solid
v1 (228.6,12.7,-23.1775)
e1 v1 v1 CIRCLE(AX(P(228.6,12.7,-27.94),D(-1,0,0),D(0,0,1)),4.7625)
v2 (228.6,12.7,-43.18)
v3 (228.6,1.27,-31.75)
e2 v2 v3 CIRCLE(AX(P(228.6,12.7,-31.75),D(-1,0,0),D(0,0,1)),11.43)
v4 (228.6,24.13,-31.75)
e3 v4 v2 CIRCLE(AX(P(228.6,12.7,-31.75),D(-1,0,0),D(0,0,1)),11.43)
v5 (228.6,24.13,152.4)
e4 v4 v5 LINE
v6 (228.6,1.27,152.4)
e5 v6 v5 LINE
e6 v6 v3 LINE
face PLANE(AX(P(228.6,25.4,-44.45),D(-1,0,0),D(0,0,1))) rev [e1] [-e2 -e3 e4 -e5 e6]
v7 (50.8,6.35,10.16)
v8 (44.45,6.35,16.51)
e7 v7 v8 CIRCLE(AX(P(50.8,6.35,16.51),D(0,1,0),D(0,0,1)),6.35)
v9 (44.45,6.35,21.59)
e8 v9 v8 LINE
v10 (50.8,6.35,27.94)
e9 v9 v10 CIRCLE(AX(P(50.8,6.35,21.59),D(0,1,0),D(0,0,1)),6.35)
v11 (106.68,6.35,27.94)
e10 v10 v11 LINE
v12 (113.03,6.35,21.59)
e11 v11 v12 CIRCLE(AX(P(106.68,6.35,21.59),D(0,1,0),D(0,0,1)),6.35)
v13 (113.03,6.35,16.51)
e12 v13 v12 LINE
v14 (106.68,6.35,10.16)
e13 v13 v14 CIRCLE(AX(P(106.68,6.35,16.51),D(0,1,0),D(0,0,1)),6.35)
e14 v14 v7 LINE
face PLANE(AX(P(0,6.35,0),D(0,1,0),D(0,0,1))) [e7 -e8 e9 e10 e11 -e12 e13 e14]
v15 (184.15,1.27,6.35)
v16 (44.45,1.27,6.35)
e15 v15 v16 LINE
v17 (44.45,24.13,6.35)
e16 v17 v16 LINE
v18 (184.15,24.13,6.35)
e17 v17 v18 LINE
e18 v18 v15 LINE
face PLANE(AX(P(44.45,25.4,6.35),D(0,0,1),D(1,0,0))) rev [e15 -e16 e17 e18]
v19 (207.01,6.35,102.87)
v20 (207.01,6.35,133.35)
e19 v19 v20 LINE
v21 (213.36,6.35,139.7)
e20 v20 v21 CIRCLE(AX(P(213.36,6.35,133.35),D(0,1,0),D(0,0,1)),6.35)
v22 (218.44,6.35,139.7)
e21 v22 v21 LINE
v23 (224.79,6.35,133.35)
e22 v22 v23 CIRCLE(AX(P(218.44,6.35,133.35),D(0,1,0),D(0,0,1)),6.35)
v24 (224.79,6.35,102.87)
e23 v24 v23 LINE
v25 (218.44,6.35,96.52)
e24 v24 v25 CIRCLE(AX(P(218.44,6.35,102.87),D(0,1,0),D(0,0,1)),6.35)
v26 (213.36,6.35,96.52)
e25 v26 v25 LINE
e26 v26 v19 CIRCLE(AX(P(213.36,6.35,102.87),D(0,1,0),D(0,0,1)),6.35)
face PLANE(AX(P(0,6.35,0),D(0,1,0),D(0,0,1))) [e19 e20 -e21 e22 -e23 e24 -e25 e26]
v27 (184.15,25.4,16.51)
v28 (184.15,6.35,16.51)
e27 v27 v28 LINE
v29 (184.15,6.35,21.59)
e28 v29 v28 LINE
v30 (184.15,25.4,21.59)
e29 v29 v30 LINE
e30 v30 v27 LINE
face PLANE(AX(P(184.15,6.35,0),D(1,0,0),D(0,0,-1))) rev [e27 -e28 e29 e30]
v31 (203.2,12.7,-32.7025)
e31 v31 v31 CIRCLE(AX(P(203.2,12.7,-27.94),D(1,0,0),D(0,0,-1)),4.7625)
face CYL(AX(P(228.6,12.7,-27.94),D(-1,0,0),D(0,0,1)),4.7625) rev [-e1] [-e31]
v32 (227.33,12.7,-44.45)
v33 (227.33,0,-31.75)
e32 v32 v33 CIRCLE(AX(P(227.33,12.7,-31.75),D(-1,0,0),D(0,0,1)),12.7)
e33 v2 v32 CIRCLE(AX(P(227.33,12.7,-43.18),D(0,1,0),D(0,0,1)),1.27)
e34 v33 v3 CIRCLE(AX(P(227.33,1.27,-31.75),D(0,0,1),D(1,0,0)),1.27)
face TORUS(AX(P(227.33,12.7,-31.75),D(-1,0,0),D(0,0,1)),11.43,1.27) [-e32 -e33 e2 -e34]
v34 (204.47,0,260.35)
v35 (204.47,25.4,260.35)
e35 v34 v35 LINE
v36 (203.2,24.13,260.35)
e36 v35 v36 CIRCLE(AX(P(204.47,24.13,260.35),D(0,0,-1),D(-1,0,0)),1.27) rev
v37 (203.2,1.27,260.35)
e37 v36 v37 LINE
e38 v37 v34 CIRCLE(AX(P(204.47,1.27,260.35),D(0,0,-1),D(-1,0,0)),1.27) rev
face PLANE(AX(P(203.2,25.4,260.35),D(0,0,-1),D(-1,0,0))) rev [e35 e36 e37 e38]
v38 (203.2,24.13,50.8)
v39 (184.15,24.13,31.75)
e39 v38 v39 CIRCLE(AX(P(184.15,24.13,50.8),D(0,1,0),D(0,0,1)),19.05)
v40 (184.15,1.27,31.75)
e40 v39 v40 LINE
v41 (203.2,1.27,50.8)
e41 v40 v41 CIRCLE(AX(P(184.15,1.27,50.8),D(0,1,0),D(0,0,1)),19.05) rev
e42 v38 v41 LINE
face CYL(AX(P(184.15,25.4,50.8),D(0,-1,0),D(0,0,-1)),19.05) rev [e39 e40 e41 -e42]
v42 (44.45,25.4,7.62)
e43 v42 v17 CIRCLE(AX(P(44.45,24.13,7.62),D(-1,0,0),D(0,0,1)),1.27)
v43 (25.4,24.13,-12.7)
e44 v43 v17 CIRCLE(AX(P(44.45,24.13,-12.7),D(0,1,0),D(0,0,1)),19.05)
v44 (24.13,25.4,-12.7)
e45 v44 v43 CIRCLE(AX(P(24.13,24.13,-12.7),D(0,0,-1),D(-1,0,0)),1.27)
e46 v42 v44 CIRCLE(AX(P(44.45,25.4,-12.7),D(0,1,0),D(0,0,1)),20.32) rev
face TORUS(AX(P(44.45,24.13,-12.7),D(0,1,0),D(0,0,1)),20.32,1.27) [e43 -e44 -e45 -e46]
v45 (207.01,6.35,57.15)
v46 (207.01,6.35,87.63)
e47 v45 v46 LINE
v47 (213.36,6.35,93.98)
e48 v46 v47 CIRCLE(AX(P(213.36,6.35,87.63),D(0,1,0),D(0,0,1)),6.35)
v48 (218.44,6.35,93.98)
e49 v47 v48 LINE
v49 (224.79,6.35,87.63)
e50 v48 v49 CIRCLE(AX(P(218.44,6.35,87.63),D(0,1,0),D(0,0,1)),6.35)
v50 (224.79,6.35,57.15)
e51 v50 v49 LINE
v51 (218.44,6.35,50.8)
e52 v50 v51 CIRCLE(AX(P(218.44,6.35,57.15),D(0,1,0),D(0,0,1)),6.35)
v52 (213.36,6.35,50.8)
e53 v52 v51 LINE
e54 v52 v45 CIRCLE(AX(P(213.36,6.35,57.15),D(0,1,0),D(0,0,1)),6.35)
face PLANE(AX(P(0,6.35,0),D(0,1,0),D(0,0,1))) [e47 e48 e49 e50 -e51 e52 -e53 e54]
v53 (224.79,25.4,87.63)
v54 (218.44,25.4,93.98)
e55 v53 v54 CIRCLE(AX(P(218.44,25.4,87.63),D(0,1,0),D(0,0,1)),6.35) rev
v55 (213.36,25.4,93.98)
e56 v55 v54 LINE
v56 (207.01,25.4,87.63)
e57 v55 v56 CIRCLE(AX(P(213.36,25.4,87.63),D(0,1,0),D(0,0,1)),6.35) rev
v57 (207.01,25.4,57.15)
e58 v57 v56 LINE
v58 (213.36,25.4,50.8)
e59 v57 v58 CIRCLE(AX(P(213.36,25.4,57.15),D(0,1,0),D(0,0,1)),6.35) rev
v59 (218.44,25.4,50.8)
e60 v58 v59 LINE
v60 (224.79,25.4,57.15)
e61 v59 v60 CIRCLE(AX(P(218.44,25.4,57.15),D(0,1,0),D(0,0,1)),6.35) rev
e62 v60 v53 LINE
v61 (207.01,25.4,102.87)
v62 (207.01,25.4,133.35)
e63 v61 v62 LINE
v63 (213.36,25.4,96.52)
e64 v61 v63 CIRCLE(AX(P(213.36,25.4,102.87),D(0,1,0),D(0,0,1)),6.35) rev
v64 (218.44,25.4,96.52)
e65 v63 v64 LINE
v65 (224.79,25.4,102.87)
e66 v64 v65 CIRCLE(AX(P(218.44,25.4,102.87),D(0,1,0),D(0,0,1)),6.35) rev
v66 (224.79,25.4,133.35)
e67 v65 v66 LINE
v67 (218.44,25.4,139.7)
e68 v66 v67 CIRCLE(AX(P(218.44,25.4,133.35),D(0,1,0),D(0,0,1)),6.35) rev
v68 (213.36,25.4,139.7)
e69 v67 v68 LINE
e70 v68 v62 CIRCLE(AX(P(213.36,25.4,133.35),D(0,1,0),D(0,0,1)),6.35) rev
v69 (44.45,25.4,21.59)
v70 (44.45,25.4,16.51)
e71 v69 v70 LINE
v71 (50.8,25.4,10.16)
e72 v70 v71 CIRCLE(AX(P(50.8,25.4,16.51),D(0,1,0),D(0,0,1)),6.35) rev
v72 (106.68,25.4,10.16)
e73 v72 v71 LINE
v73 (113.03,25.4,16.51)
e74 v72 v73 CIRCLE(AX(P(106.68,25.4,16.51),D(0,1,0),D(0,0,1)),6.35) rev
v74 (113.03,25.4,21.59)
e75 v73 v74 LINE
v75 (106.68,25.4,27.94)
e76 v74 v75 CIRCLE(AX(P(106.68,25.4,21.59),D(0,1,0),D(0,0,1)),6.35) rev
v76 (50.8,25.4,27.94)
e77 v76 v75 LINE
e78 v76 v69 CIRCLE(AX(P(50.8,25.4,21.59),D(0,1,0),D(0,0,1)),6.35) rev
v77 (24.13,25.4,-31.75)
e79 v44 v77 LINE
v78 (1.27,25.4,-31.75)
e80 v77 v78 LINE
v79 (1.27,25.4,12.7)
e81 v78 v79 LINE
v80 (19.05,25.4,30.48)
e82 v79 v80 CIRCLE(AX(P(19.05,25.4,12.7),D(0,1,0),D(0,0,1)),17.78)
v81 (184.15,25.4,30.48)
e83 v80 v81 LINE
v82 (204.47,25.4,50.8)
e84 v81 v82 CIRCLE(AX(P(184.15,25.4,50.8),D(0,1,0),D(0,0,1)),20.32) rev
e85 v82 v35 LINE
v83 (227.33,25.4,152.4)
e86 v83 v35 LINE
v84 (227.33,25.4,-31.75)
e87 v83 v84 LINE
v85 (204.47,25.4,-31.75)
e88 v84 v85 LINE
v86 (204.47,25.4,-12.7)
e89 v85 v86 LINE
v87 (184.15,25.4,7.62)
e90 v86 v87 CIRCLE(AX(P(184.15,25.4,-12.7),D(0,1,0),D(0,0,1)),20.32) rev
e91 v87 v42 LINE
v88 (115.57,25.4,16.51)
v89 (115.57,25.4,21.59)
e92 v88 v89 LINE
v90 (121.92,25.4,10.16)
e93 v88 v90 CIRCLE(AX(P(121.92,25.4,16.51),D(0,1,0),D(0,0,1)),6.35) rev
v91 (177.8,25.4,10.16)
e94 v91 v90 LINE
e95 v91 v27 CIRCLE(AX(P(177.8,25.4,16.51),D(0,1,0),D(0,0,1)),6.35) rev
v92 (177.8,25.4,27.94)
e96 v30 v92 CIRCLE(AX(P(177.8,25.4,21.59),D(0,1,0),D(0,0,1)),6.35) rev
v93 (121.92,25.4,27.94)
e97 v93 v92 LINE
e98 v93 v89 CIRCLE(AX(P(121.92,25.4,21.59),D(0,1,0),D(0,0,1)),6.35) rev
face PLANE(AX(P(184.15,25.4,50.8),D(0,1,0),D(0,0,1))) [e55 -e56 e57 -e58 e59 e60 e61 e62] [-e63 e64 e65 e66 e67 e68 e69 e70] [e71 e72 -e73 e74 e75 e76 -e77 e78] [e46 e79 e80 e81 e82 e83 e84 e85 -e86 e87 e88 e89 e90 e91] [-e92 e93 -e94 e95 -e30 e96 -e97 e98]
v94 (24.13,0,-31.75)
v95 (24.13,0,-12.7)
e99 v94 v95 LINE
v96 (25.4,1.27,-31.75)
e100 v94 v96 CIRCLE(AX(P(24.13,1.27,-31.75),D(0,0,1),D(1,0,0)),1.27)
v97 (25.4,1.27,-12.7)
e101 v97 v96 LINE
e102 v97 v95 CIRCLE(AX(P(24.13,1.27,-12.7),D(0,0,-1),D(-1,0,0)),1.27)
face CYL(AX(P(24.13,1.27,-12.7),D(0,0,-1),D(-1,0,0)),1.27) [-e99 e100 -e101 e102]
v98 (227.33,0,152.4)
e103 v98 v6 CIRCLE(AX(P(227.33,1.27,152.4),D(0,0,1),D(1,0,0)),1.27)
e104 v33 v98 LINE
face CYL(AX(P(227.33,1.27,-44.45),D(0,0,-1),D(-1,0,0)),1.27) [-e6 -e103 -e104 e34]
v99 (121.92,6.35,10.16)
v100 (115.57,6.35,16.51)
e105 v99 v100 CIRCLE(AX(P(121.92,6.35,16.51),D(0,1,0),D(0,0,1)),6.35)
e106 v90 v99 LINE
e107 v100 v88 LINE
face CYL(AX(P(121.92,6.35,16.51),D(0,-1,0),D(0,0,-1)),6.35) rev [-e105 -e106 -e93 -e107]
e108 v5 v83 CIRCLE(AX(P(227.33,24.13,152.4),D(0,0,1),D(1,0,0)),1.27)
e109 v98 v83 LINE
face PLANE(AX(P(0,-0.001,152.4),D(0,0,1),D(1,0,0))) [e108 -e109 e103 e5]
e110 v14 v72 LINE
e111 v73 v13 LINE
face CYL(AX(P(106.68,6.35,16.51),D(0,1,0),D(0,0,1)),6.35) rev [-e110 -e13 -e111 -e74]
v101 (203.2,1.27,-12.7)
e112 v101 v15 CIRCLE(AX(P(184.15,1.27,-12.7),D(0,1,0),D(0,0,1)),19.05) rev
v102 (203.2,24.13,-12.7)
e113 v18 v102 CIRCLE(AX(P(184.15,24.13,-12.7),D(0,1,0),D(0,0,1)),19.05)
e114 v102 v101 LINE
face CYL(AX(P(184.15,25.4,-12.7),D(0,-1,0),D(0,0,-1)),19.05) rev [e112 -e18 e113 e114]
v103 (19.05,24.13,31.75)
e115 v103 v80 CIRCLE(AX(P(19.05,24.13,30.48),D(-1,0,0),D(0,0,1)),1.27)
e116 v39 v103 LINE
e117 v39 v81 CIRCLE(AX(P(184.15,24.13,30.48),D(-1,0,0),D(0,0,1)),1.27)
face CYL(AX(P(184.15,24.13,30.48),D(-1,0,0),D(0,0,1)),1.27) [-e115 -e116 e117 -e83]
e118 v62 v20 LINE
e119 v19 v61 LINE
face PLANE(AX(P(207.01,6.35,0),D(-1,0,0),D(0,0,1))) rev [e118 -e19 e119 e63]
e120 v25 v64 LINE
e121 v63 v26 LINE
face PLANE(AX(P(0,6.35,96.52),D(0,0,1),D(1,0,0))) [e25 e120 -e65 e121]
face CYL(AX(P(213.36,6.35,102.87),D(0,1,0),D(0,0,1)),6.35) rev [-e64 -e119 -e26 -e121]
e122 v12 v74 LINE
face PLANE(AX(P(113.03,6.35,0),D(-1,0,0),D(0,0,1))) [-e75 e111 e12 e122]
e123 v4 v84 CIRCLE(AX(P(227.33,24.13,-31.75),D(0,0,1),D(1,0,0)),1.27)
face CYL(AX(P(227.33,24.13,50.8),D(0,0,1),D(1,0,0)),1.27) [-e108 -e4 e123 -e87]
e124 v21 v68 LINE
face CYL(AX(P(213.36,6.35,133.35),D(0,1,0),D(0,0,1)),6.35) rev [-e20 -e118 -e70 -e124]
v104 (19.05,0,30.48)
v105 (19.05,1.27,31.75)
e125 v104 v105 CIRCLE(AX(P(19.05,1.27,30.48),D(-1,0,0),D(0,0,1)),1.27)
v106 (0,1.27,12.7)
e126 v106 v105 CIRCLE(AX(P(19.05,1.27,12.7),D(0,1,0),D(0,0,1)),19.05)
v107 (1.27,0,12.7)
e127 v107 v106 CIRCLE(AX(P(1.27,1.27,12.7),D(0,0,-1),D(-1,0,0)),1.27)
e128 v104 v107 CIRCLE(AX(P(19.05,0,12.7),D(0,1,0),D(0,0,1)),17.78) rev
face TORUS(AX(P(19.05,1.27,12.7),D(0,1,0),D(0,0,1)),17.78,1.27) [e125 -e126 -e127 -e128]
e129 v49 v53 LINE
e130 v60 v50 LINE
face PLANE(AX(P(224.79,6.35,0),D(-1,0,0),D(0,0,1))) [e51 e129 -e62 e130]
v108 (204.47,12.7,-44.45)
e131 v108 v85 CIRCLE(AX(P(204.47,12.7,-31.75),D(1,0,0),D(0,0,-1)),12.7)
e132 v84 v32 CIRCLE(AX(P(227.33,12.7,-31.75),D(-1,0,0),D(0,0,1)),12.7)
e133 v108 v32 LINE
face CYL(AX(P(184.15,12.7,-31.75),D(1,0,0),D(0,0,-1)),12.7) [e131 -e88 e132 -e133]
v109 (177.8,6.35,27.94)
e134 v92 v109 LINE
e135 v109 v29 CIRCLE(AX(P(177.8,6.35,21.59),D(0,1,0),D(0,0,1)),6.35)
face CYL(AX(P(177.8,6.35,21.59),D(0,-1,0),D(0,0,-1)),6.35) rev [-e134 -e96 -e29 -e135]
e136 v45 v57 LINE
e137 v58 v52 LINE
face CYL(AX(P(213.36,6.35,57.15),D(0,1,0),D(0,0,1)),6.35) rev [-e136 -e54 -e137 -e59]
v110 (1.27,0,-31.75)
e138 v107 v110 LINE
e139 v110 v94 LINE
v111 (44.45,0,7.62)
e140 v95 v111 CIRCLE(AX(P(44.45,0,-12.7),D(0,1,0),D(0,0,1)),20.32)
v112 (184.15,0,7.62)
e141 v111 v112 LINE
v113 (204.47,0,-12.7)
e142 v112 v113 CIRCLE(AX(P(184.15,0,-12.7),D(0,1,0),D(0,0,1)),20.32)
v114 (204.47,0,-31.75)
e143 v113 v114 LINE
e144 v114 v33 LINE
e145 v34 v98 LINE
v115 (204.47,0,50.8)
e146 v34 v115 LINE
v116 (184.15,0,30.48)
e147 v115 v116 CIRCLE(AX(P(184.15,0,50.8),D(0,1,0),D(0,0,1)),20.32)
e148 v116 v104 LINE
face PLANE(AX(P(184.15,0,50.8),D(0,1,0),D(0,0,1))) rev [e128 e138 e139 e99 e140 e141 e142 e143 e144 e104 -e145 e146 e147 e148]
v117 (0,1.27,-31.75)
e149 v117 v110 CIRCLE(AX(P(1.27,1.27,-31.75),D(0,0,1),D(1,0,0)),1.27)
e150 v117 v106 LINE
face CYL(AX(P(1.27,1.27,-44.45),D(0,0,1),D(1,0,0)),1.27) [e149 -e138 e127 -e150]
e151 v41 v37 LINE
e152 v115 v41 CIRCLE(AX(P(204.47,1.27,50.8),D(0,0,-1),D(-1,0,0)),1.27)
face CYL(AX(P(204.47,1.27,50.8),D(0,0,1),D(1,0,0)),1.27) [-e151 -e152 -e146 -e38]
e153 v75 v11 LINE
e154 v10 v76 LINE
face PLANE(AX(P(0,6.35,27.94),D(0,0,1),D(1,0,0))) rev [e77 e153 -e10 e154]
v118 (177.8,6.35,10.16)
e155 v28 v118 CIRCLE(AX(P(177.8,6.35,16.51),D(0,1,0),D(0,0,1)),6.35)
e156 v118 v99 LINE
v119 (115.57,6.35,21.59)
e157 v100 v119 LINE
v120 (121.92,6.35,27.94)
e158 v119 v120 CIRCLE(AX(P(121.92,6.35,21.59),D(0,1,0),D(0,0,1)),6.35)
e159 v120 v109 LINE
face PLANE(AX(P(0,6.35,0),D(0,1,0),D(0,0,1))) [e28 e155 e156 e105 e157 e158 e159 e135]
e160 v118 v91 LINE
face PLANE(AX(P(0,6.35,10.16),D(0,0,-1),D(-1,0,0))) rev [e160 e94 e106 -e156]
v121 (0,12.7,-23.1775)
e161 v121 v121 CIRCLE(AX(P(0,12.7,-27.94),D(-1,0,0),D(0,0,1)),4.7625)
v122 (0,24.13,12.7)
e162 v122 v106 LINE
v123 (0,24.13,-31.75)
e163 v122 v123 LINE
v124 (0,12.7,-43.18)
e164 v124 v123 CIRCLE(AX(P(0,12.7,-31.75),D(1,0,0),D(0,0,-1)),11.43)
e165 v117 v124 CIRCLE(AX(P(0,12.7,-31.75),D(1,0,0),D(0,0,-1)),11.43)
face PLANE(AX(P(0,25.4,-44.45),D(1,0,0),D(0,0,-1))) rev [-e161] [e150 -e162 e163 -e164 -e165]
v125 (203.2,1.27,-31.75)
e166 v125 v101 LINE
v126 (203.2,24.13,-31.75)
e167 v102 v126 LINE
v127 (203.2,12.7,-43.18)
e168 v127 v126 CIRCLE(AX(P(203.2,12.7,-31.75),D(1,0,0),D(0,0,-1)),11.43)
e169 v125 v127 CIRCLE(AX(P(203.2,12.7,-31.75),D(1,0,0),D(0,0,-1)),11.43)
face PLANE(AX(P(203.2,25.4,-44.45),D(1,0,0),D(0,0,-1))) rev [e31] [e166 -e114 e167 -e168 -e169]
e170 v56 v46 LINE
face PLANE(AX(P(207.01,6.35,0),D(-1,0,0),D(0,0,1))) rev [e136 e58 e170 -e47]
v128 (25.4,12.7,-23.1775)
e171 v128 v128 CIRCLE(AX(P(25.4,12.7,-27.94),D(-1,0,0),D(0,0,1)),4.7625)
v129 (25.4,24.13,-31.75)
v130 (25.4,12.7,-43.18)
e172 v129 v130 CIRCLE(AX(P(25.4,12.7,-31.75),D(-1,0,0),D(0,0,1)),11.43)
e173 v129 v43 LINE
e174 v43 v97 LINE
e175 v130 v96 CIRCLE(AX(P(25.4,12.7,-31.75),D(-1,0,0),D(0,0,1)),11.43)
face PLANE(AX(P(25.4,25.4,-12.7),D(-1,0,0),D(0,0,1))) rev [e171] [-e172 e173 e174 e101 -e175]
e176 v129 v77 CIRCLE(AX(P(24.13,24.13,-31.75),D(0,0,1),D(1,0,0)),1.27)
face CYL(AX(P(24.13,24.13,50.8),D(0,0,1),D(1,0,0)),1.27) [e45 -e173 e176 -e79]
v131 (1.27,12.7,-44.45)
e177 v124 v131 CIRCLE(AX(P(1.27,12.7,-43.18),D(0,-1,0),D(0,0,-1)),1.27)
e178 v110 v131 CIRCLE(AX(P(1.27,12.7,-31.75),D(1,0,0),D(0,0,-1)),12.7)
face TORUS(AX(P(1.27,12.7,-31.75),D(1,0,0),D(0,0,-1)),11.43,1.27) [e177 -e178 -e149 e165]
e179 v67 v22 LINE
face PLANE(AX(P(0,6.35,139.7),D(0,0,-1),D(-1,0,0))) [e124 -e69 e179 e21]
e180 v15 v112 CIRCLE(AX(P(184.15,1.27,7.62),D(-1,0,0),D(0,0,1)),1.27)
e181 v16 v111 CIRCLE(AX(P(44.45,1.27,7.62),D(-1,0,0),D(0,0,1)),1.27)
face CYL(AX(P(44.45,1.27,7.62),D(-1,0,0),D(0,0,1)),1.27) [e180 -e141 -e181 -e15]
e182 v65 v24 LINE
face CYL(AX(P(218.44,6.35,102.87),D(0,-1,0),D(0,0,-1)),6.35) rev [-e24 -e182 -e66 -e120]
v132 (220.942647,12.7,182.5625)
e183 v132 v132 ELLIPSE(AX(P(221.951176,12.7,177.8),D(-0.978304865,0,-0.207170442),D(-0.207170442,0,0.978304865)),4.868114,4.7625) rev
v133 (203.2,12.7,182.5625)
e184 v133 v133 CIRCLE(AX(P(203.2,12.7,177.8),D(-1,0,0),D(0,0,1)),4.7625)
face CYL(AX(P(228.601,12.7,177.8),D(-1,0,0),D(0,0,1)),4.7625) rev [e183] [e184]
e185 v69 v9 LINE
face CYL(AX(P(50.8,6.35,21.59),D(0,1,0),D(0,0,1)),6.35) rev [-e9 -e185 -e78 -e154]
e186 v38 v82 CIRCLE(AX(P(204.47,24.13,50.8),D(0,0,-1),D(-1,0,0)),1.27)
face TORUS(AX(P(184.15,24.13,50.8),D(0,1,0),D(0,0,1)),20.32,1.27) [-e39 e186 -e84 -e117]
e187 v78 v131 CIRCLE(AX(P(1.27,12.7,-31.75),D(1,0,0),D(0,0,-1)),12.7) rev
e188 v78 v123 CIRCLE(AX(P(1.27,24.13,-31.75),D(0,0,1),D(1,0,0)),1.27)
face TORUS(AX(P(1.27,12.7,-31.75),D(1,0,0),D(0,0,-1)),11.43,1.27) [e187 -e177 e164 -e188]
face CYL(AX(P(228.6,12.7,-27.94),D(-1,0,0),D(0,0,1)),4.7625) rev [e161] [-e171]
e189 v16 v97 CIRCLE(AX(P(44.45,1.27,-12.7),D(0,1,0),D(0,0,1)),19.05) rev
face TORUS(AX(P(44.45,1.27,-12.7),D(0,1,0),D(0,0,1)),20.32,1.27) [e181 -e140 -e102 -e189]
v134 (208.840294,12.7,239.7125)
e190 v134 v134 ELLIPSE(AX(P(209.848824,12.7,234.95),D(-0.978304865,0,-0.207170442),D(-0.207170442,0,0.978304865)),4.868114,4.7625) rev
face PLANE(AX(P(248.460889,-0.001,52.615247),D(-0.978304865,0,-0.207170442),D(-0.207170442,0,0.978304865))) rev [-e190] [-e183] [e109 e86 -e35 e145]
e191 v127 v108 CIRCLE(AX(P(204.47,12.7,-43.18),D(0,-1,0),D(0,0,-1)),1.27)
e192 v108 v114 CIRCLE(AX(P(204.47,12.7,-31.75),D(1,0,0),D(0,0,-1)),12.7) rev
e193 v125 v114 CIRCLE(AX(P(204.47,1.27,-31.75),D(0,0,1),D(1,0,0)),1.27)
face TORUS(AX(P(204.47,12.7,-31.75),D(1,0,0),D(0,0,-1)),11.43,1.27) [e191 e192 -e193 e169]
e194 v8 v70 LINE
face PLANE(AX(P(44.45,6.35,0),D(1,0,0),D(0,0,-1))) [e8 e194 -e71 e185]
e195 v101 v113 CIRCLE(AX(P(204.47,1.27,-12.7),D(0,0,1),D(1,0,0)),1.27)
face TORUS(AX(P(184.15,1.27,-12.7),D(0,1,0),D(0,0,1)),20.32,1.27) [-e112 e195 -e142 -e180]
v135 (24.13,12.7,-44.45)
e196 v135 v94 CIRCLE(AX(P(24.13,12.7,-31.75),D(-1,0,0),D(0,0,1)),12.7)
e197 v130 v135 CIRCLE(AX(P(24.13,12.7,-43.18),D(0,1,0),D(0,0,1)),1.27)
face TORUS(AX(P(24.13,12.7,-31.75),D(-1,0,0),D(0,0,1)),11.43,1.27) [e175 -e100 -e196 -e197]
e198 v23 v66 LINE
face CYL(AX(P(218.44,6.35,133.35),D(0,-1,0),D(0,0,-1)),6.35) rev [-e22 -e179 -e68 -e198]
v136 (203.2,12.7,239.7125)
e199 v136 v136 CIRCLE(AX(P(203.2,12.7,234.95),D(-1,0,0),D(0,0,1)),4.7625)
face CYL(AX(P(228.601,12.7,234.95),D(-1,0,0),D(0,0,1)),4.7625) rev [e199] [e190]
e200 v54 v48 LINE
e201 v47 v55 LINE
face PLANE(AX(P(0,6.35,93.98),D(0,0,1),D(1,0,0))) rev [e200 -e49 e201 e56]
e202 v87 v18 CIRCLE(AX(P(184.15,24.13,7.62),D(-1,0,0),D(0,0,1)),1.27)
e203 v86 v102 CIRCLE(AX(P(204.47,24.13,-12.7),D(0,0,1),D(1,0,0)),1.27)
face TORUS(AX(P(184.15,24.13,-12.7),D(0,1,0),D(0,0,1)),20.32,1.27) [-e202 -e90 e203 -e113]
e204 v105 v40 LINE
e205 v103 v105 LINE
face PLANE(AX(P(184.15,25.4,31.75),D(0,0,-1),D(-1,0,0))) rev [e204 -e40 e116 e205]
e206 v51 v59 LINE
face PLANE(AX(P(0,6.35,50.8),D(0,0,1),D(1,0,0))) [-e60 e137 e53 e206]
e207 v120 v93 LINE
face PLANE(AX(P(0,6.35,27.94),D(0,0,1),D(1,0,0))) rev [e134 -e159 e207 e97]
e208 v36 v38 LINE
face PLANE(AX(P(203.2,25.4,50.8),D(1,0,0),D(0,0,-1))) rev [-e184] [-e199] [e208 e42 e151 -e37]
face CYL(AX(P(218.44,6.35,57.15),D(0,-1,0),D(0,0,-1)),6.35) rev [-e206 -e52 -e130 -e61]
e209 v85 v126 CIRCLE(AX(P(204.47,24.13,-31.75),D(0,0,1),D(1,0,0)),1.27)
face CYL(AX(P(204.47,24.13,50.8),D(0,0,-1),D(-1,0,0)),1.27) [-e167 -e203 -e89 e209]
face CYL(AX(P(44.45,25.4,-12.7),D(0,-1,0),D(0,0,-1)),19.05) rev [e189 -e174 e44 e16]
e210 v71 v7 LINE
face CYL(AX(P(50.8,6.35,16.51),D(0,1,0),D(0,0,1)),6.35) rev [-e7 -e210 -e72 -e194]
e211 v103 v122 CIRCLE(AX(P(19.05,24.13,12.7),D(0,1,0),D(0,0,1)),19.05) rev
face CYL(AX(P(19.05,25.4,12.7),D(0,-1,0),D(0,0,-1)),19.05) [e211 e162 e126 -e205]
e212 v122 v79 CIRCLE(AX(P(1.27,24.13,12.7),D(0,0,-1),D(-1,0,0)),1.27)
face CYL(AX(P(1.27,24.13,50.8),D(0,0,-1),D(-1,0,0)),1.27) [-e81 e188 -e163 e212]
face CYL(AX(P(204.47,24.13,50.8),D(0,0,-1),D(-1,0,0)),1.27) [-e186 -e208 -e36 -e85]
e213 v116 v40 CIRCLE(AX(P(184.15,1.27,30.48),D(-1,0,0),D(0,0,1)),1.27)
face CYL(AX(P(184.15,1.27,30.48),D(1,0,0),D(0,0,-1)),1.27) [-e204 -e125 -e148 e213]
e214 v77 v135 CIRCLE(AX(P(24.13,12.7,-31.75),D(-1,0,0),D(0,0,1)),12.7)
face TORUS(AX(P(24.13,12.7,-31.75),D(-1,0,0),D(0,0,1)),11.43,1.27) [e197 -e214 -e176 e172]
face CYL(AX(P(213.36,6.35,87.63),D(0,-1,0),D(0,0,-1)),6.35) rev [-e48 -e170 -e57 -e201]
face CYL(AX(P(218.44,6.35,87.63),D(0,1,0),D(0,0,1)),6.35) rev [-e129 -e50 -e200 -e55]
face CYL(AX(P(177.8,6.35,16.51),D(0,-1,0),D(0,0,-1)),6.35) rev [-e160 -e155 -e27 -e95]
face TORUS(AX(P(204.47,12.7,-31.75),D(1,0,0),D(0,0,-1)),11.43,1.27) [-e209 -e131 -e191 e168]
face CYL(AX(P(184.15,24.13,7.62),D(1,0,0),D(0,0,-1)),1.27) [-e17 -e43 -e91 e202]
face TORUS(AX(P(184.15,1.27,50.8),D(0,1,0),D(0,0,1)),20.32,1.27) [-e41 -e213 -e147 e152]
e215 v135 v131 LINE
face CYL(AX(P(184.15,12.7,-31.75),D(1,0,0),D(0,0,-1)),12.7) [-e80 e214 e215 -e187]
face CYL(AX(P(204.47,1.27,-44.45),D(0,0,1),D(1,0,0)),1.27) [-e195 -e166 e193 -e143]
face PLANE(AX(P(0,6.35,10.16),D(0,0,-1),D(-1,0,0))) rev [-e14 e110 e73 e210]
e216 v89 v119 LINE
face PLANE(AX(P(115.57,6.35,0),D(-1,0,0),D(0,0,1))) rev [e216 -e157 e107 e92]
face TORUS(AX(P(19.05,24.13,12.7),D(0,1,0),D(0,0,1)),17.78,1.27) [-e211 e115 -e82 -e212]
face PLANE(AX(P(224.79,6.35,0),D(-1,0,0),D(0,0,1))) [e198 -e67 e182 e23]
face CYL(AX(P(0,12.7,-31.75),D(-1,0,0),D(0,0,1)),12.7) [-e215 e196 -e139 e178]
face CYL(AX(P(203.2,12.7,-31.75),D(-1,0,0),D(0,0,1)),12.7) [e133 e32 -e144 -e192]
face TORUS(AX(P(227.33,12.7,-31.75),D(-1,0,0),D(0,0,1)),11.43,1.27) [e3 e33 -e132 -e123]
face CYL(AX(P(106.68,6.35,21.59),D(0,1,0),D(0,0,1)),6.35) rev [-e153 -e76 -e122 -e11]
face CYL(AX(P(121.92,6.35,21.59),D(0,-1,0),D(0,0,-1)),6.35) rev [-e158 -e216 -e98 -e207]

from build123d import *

# Parameters (mm, degrees)
BOSS_EXTRUDE1_DEPTH     = 25.4
CUT_EXTRUDE3_REACH      = 349.398
FILLET1_R               = 1.27
CUT_EXTRUDE4_REACH      = 333.236
SKETCH4_R               = 4.7625
FILLET2_R               = 12.7
CUT_EXTRUDE5_DEPTH      = 332.236354444
CUT_EXTRUDE5_DEPTH_BACK = 332.236354444
SKETCH17_R              = 4.7625
SKETCH18_W              = 68.58
SKETCH18_H              = 17.78
SKETCH18_W_2            = 17.78
SKETCH18_H_2            = 43.18
CUT_EXTRUDE6_DEPTH      = 19.05
FILLET3_R               = 6.35


with BuildPart() as part:
    # Sketch1 → Boss-Extrude1 (new body)
    with BuildSketch(Plane(origin=(0, 0, 0), x_dir=(1, 0, 0), z_dir=(0, 1, 0))):
        with BuildLine():
            Line((44.45, -6.35), (184.15, -6.35))
            ThreePointArc((184.15, -6.35), (197.620384182, -0.770384182), (203.2, 12.7))
            Line((203.2, 12.7), (203.2, 44.45))
            Line((203.2, 44.45), (228.6, 44.45))
            Line((228.6, 44.45), (228.6, -260.35))
            Line((228.6, -260.35), (203.2, -260.35))
            Line((203.2, -260.35), (203.2, -50.8))
            ThreePointArc((203.2, -50.8), (197.620384182, -37.329615818), (184.15, -31.75))
            Line((184.15, -31.75), (19.05, -31.75))
            ThreePointArc((19.05, -31.75), (5.579615818, -26.170384182), (0, -12.7))
            Line((0, -12.7), (0, 44.45))
            Line((0, 44.45), (25.4, 44.45))
            Line((25.4, 44.45), (25.4, 12.7))
            ThreePointArc((25.4, 12.7), (30.979615818, -0.770384182), (44.45, -6.35))
        make_face()
    extrude(amount=BOSS_EXTRUDE1_DEPTH)

    # Sketch3 → Cut-Extrude3 (cut, up to next)
    with BuildSketch(Plane(origin=(0, 25.4, 0), x_dir=(1, 0, 0), z_dir=(0, 1, 0)), mode=Mode.PRIVATE) as cut_extrude3_sk1:
        Polygon((215.9, -260.35), (228.6, -260.35), (228.6, -152.4), (227.33, -152.4), (204.47, -260.35), align=None)
    cut_extrude3_tool1 = extrude(cut_extrude3_sk1.sketch, amount=-CUT_EXTRUDE3_REACH, mode=Mode.PRIVATE) & part.part
    add(cut_extrude3_tool1.solids().sort_by_distance((220.5355, 25.4, 222.5675))[0], mode=Mode.SUBTRACT)

    # Fillet1
    fillet1_edges = [part.edges().sort_by_distance(p)[0] for p in [
        (0, 12.7, -44.45),
        (25.4, 12.7, -44.45),
        (203.2, 12.7, -44.45),
        (228.6, 12.7, -44.45),
        (228.6, 0, 53.975),
        (203.2, 0, 155.575),
        (197.620384182, 0, 37.329615818),
        (5.579615818, 0, 26.170384182),
        (101.6, 0, 31.75),
        (197.620384182, 0, 0.770384182),
        (203.2, 0, -28.575),
        (114.3, 0, 6.35),
        (30.979615818, 0, 0.770384182),
        (25.4, 0, -28.575),
        (0, 0, -15.875),
        (25.4, 25.4, -28.575),
        (30.979615818, 25.4, 0.770384182),
        (114.3, 25.4, 6.35),
        (197.620384182, 25.4, 0.770384182),
        (203.2, 25.4, -28.575),
        (228.6, 25.4, 53.975),
        (203.2, 25.4, 155.575),
        (197.620384182, 25.4, 37.329615818),
        (101.6, 25.4, 31.75),
        (5.579615818, 25.4, 26.170384182),
        (0, 25.4, -15.875),
    ]]
    fillet(fillet1_edges, radius=FILLET1_R)

    # Cut-Extrude4: up to this plane
    cut_extrude4_end = Plane(origin=(248.460888859, -0.001, 52.615247053), z_dir=(-0.9783048645494203, 0, -0.20717044190458336))
    # Sketch4 → Cut-Extrude4 (cut, up to the surface)
    with BuildSketch(Plane.ZY.offset(-203.2), mode=Mode.PRIVATE) as cut_extrude4_sk1:
        with BuildLine():
            ThreePointArc((182.5625, 12.7), (177.8, 17.4625), (173.0375, 12.7))
            Line((173.0375, 12.7), (182.5625, 12.7))
        make_face()
    cut_extrude4_tool1 = split(extrude(cut_extrude4_sk1.sketch, amount=-CUT_EXTRUDE4_REACH, mode=Mode.PRIVATE), bisect_by=cut_extrude4_end, keep=Keep.BOTH, mode=Mode.PRIVATE)
    add(cut_extrude4_tool1.solids().sort_by_distance((203.2, 14.721268, 177.8))[0], mode=Mode.SUBTRACT)
    # Sketch4 → Cut-Extrude4 (cut, up to the surface)
    with BuildSketch(Plane.ZY.offset(-203.2), mode=Mode.PRIVATE) as cut_extrude4_sk2:
        with BuildLine():
            Line((182.5625, 12.7), (173.0375, 12.7))
            ThreePointArc((173.0375, 12.7), (177.8, 7.9375), (182.5625, 12.7))
        make_face()
    cut_extrude4_tool2 = split(extrude(cut_extrude4_sk2.sketch, amount=-CUT_EXTRUDE4_REACH, mode=Mode.PRIVATE), bisect_by=cut_extrude4_end, keep=Keep.BOTH, mode=Mode.PRIVATE)
    add(cut_extrude4_tool2.solids().sort_by_distance((203.2, 10.678732, 177.8))[0], mode=Mode.SUBTRACT)
    # Sketch4 → Cut-Extrude4 (cut, up to the surface)
    with BuildSketch(Plane.ZY.offset(-203.2), mode=Mode.PRIVATE) as cut_extrude4_sk3:
        with BuildLine():
            ThreePointArc((182.5625, 12.7), (177.8, 17.4625), (173.0375, 12.7))
            Line((173.0375, 12.7), (182.5625, 12.7))
        make_face()
    cut_extrude4_tool3 = split(extrude(cut_extrude4_sk3.sketch, amount=-CUT_EXTRUDE4_REACH, mode=Mode.PRIVATE), bisect_by=cut_extrude4_end, keep=Keep.BOTH, mode=Mode.PRIVATE)
    add(cut_extrude4_tool3.solids().sort_by_distance((203.2, 14.721268, 177.8))[0], mode=Mode.SUBTRACT)
    # Sketch4 → Cut-Extrude4 (cut, up to the surface)
    with BuildSketch(Plane.ZY.offset(-203.2), mode=Mode.PRIVATE) as cut_extrude4_sk4:
        with BuildLine():
            Line((182.5625, 12.7), (173.0375, 12.7))
            ThreePointArc((173.0375, 12.7), (177.8, 7.9375), (182.5625, 12.7))
        make_face()
    cut_extrude4_tool4 = split(extrude(cut_extrude4_sk4.sketch, amount=-CUT_EXTRUDE4_REACH, mode=Mode.PRIVATE), bisect_by=cut_extrude4_end, keep=Keep.BOTH, mode=Mode.PRIVATE)
    add(cut_extrude4_tool4.solids().sort_by_distance((203.2, 10.678732, 177.8))[0], mode=Mode.SUBTRACT)
    # Sketch4 → Cut-Extrude4 (cut, up to the surface)
    with BuildSketch(Plane.ZY.offset(-203.2), mode=Mode.PRIVATE) as cut_extrude4_sk5:
        with Locations((234.95, 12.7)):
            Circle(SKETCH4_R)
    cut_extrude4_tool5 = split(extrude(cut_extrude4_sk5.sketch, amount=-CUT_EXTRUDE4_REACH, mode=Mode.PRIVATE), bisect_by=cut_extrude4_end, keep=Keep.BOTH, mode=Mode.PRIVATE)
    add(cut_extrude4_tool5.solids().sort_by_distance((203.2, 12.7, 234.95))[0], mode=Mode.SUBTRACT)

    # Fillet2
    # the kernel refuses this fillet: 12.7 mm, written as the material it takes off along each edge
    with BuildSketch(Plane(origin=(0, 12.7, -31.75), x_dir=(0, 1, 0), z_dir=(0, 0, 1))) as fillet2_piece_1:
        with BuildLine():
            CenterArc((11.43, -1.27), 1.27, 0, 90)
            Line((12.7, -1.27), (12.7, 0))
            Line((12.7, 0), (11.43, 0))
        make_face()
    revolve(axis=Axis((0, 12.7, -31.75), (-1, 0, 0)), revolution_arc=90, mode=Mode.SUBTRACT)
    with BuildSketch(Plane(origin=(25.4, 12.7, -31.75), x_dir=(0, 0, -1), z_dir=(0, -1, 0))) as fillet2_piece_2:
        with BuildLine():
            CenterArc((11.43, -1.27), 1.27, 0, 90)
            Line((12.7, -1.27), (12.7, 0))
            Line((12.7, 0), (11.43, 0))
        make_face()
    revolve(axis=Axis((25.4, 12.7, -31.75), (1, 0, 0)), revolution_arc=90, mode=Mode.SUBTRACT)
    with BuildSketch(Plane(origin=(203.2, 12.7, -31.75), x_dir=(0, 0, -1), z_dir=(0, 1, 0))) as fillet2_piece_3:
        with BuildLine():
            CenterArc((11.43, -1.27), 1.27, 0, 90)
            Line((12.7, -1.27), (12.7, 0))
            Line((12.7, 0), (11.43, 0))
        make_face()
    revolve(axis=Axis((203.2, 12.7, -31.75), (-1, 0, 0)), revolution_arc=90, mode=Mode.SUBTRACT)
    with BuildSketch(Plane(origin=(228.6, 12.7, -31.75), x_dir=(0, -1, 0), z_dir=(0, 0, 1))) as fillet2_piece_4:
        with BuildLine():
            CenterArc((11.43, -1.27), 1.27, 0, 90)
            Line((12.7, -1.27), (12.7, 0))
            Line((12.7, 0), (11.43, 0))
        make_face()
    revolve(axis=Axis((228.6, 12.7, -31.75), (1, 0, 0)), revolution_arc=90, mode=Mode.SUBTRACT)
    with BuildSketch(Plane(origin=(203.2, 12.7, -31.75), x_dir=(0, 1, 0), z_dir=(0, 0, 1))) as fillet2_piece_5:
        with BuildLine():
            CenterArc((11.43, -1.27), 1.27, 0, 90)
            Line((12.7, -1.27), (12.7, 0))
            Line((12.7, 0), (11.43, 0))
        make_face()
    revolve(axis=Axis((203.2, 12.7, -31.75), (-1, 0, 0)), revolution_arc=90, mode=Mode.SUBTRACT)
    with BuildSketch(Plane(origin=(228.6, 12.7, -31.75), x_dir=(0, 0, -1), z_dir=(0, -1, 0))) as fillet2_piece_6:
        with BuildLine():
            CenterArc((11.43, -1.27), 1.27, 0, 90)
            Line((12.7, -1.27), (12.7, 0))
            Line((12.7, 0), (11.43, 0))
        make_face()
    revolve(axis=Axis((228.6, 12.7, -31.75), (1, 0, 0)), revolution_arc=90, mode=Mode.SUBTRACT)
    with BuildSketch(Plane(origin=(0, 12.7, -31.75), x_dir=(0, 0, -1), z_dir=(0, 1, 0))) as fillet2_piece_7:
        with BuildLine():
            CenterArc((11.43, -1.27), 1.27, 0, 90)
            Line((12.7, -1.27), (12.7, 0))
            Line((12.7, 0), (11.43, 0))
        make_face()
    revolve(axis=Axis((0, 12.7, -31.75), (-1, 0, 0)), revolution_arc=90, mode=Mode.SUBTRACT)
    with BuildSketch(Plane(origin=(25.4, 12.7, -31.75), x_dir=(0, -1, 0), z_dir=(0, 0, 1))) as fillet2_piece_8:
        with BuildLine():
            CenterArc((11.43, -1.27), 1.27, 0, 90)
            Line((12.7, -1.27), (12.7, 0))
            Line((12.7, 0), (11.43, 0))
        make_face()
    revolve(axis=Axis((25.4, 12.7, -31.75), (1, 0, 0)), revolution_arc=90, mode=Mode.SUBTRACT)
    with BuildSketch(Plane(origin=(203.2, 25.4, -44.45), x_dir=(0, 0, 1), z_dir=(1, 0, 0)), Plane(origin=(0, 25.4, -44.45), x_dir=(0, 0, 1), z_dir=(1, 0, 0))) as fillet2_piece_9:
        with BuildLine():
            CenterArc((FILLET2_R, FILLET2_R), FILLET2_R, 180, 90)
            Line((0, FILLET2_R), (0, 0))
            Line((0, 0), (FILLET2_R, 0))
        make_face()
    extrude(amount=25.4, mode=Mode.SUBTRACT)
    with BuildSketch(Plane(origin=(203.2, 0, -44.45), x_dir=(0, 0, 1), z_dir=(1, 0, 0)), Plane(origin=(0, 0, -44.45), x_dir=(0, 0, 1), z_dir=(1, 0, 0))) as fillet2_piece_10:
        with BuildLine():
            CenterArc((FILLET2_R, -FILLET2_R), FILLET2_R, 90, 90)
            Line((0, -FILLET2_R), (0, 0))
            Line((0, 0), (FILLET2_R, 0))
        make_face()
    extrude(amount=25.4, mode=Mode.SUBTRACT)

    # Sketch17 → Cut-Extrude5 (cut, two sides: drawn at the far end of the back side and taken through both)
    with BuildSketch(Plane.ZY.offset(-203.2).offset(-CUT_EXTRUDE5_DEPTH_BACK)):
        with Locations((-27.94, 12.7)):
            Circle(SKETCH17_R)
    extrude(amount=CUT_EXTRUDE5_DEPTH + CUT_EXTRUDE5_DEPTH_BACK, mode=Mode.SUBTRACT)

    # Sketch18 → Cut-Extrude6 (cut)
    with BuildSketch(Plane(origin=(0, 25.4, 0), x_dir=(1, 0, 0), z_dir=(0, 1, 0))):
        with Locations((78.74, -19.05)):
            Rectangle(SKETCH18_W, SKETCH18_H)
        with Locations((149.86, -19.05)):
            Rectangle(SKETCH18_W, SKETCH18_H)
        with Locations((215.9, -72.39)):
            Rectangle(SKETCH18_W_2, SKETCH18_H_2)
        with Locations((215.9, -118.11)):
            Rectangle(SKETCH18_W_2, SKETCH18_H_2)
    extrude(amount=-CUT_EXTRUDE6_DEPTH, mode=Mode.SUBTRACT)

    # Fillet3
    fillet3_edges = [part.edges().sort_by_distance(p)[0] for p in [
        (224.79, 15.875, 96.52),
        (224.79, 15.875, 139.7),
        (207.01, 15.875, 139.7),
        (207.01, 15.875, 96.52),
        (224.79, 15.875, 50.8),
        (224.79, 15.875, 93.98),
        (207.01, 15.875, 93.98),
        (207.01, 15.875, 50.8),
        (115.57, 15.875, 10.16),
        (184.15, 15.875, 10.16),
        (184.15, 15.875, 27.94),
        (115.57, 15.875, 27.94),
        (113.03, 15.875, 10.16),
        (113.03, 15.875, 27.94),
        (44.45, 15.875, 27.94),
        (44.45, 15.875, 10.16),
    ]]
    fillet(fillet3_edges, radius=FILLET3_R)


solid = part.part
